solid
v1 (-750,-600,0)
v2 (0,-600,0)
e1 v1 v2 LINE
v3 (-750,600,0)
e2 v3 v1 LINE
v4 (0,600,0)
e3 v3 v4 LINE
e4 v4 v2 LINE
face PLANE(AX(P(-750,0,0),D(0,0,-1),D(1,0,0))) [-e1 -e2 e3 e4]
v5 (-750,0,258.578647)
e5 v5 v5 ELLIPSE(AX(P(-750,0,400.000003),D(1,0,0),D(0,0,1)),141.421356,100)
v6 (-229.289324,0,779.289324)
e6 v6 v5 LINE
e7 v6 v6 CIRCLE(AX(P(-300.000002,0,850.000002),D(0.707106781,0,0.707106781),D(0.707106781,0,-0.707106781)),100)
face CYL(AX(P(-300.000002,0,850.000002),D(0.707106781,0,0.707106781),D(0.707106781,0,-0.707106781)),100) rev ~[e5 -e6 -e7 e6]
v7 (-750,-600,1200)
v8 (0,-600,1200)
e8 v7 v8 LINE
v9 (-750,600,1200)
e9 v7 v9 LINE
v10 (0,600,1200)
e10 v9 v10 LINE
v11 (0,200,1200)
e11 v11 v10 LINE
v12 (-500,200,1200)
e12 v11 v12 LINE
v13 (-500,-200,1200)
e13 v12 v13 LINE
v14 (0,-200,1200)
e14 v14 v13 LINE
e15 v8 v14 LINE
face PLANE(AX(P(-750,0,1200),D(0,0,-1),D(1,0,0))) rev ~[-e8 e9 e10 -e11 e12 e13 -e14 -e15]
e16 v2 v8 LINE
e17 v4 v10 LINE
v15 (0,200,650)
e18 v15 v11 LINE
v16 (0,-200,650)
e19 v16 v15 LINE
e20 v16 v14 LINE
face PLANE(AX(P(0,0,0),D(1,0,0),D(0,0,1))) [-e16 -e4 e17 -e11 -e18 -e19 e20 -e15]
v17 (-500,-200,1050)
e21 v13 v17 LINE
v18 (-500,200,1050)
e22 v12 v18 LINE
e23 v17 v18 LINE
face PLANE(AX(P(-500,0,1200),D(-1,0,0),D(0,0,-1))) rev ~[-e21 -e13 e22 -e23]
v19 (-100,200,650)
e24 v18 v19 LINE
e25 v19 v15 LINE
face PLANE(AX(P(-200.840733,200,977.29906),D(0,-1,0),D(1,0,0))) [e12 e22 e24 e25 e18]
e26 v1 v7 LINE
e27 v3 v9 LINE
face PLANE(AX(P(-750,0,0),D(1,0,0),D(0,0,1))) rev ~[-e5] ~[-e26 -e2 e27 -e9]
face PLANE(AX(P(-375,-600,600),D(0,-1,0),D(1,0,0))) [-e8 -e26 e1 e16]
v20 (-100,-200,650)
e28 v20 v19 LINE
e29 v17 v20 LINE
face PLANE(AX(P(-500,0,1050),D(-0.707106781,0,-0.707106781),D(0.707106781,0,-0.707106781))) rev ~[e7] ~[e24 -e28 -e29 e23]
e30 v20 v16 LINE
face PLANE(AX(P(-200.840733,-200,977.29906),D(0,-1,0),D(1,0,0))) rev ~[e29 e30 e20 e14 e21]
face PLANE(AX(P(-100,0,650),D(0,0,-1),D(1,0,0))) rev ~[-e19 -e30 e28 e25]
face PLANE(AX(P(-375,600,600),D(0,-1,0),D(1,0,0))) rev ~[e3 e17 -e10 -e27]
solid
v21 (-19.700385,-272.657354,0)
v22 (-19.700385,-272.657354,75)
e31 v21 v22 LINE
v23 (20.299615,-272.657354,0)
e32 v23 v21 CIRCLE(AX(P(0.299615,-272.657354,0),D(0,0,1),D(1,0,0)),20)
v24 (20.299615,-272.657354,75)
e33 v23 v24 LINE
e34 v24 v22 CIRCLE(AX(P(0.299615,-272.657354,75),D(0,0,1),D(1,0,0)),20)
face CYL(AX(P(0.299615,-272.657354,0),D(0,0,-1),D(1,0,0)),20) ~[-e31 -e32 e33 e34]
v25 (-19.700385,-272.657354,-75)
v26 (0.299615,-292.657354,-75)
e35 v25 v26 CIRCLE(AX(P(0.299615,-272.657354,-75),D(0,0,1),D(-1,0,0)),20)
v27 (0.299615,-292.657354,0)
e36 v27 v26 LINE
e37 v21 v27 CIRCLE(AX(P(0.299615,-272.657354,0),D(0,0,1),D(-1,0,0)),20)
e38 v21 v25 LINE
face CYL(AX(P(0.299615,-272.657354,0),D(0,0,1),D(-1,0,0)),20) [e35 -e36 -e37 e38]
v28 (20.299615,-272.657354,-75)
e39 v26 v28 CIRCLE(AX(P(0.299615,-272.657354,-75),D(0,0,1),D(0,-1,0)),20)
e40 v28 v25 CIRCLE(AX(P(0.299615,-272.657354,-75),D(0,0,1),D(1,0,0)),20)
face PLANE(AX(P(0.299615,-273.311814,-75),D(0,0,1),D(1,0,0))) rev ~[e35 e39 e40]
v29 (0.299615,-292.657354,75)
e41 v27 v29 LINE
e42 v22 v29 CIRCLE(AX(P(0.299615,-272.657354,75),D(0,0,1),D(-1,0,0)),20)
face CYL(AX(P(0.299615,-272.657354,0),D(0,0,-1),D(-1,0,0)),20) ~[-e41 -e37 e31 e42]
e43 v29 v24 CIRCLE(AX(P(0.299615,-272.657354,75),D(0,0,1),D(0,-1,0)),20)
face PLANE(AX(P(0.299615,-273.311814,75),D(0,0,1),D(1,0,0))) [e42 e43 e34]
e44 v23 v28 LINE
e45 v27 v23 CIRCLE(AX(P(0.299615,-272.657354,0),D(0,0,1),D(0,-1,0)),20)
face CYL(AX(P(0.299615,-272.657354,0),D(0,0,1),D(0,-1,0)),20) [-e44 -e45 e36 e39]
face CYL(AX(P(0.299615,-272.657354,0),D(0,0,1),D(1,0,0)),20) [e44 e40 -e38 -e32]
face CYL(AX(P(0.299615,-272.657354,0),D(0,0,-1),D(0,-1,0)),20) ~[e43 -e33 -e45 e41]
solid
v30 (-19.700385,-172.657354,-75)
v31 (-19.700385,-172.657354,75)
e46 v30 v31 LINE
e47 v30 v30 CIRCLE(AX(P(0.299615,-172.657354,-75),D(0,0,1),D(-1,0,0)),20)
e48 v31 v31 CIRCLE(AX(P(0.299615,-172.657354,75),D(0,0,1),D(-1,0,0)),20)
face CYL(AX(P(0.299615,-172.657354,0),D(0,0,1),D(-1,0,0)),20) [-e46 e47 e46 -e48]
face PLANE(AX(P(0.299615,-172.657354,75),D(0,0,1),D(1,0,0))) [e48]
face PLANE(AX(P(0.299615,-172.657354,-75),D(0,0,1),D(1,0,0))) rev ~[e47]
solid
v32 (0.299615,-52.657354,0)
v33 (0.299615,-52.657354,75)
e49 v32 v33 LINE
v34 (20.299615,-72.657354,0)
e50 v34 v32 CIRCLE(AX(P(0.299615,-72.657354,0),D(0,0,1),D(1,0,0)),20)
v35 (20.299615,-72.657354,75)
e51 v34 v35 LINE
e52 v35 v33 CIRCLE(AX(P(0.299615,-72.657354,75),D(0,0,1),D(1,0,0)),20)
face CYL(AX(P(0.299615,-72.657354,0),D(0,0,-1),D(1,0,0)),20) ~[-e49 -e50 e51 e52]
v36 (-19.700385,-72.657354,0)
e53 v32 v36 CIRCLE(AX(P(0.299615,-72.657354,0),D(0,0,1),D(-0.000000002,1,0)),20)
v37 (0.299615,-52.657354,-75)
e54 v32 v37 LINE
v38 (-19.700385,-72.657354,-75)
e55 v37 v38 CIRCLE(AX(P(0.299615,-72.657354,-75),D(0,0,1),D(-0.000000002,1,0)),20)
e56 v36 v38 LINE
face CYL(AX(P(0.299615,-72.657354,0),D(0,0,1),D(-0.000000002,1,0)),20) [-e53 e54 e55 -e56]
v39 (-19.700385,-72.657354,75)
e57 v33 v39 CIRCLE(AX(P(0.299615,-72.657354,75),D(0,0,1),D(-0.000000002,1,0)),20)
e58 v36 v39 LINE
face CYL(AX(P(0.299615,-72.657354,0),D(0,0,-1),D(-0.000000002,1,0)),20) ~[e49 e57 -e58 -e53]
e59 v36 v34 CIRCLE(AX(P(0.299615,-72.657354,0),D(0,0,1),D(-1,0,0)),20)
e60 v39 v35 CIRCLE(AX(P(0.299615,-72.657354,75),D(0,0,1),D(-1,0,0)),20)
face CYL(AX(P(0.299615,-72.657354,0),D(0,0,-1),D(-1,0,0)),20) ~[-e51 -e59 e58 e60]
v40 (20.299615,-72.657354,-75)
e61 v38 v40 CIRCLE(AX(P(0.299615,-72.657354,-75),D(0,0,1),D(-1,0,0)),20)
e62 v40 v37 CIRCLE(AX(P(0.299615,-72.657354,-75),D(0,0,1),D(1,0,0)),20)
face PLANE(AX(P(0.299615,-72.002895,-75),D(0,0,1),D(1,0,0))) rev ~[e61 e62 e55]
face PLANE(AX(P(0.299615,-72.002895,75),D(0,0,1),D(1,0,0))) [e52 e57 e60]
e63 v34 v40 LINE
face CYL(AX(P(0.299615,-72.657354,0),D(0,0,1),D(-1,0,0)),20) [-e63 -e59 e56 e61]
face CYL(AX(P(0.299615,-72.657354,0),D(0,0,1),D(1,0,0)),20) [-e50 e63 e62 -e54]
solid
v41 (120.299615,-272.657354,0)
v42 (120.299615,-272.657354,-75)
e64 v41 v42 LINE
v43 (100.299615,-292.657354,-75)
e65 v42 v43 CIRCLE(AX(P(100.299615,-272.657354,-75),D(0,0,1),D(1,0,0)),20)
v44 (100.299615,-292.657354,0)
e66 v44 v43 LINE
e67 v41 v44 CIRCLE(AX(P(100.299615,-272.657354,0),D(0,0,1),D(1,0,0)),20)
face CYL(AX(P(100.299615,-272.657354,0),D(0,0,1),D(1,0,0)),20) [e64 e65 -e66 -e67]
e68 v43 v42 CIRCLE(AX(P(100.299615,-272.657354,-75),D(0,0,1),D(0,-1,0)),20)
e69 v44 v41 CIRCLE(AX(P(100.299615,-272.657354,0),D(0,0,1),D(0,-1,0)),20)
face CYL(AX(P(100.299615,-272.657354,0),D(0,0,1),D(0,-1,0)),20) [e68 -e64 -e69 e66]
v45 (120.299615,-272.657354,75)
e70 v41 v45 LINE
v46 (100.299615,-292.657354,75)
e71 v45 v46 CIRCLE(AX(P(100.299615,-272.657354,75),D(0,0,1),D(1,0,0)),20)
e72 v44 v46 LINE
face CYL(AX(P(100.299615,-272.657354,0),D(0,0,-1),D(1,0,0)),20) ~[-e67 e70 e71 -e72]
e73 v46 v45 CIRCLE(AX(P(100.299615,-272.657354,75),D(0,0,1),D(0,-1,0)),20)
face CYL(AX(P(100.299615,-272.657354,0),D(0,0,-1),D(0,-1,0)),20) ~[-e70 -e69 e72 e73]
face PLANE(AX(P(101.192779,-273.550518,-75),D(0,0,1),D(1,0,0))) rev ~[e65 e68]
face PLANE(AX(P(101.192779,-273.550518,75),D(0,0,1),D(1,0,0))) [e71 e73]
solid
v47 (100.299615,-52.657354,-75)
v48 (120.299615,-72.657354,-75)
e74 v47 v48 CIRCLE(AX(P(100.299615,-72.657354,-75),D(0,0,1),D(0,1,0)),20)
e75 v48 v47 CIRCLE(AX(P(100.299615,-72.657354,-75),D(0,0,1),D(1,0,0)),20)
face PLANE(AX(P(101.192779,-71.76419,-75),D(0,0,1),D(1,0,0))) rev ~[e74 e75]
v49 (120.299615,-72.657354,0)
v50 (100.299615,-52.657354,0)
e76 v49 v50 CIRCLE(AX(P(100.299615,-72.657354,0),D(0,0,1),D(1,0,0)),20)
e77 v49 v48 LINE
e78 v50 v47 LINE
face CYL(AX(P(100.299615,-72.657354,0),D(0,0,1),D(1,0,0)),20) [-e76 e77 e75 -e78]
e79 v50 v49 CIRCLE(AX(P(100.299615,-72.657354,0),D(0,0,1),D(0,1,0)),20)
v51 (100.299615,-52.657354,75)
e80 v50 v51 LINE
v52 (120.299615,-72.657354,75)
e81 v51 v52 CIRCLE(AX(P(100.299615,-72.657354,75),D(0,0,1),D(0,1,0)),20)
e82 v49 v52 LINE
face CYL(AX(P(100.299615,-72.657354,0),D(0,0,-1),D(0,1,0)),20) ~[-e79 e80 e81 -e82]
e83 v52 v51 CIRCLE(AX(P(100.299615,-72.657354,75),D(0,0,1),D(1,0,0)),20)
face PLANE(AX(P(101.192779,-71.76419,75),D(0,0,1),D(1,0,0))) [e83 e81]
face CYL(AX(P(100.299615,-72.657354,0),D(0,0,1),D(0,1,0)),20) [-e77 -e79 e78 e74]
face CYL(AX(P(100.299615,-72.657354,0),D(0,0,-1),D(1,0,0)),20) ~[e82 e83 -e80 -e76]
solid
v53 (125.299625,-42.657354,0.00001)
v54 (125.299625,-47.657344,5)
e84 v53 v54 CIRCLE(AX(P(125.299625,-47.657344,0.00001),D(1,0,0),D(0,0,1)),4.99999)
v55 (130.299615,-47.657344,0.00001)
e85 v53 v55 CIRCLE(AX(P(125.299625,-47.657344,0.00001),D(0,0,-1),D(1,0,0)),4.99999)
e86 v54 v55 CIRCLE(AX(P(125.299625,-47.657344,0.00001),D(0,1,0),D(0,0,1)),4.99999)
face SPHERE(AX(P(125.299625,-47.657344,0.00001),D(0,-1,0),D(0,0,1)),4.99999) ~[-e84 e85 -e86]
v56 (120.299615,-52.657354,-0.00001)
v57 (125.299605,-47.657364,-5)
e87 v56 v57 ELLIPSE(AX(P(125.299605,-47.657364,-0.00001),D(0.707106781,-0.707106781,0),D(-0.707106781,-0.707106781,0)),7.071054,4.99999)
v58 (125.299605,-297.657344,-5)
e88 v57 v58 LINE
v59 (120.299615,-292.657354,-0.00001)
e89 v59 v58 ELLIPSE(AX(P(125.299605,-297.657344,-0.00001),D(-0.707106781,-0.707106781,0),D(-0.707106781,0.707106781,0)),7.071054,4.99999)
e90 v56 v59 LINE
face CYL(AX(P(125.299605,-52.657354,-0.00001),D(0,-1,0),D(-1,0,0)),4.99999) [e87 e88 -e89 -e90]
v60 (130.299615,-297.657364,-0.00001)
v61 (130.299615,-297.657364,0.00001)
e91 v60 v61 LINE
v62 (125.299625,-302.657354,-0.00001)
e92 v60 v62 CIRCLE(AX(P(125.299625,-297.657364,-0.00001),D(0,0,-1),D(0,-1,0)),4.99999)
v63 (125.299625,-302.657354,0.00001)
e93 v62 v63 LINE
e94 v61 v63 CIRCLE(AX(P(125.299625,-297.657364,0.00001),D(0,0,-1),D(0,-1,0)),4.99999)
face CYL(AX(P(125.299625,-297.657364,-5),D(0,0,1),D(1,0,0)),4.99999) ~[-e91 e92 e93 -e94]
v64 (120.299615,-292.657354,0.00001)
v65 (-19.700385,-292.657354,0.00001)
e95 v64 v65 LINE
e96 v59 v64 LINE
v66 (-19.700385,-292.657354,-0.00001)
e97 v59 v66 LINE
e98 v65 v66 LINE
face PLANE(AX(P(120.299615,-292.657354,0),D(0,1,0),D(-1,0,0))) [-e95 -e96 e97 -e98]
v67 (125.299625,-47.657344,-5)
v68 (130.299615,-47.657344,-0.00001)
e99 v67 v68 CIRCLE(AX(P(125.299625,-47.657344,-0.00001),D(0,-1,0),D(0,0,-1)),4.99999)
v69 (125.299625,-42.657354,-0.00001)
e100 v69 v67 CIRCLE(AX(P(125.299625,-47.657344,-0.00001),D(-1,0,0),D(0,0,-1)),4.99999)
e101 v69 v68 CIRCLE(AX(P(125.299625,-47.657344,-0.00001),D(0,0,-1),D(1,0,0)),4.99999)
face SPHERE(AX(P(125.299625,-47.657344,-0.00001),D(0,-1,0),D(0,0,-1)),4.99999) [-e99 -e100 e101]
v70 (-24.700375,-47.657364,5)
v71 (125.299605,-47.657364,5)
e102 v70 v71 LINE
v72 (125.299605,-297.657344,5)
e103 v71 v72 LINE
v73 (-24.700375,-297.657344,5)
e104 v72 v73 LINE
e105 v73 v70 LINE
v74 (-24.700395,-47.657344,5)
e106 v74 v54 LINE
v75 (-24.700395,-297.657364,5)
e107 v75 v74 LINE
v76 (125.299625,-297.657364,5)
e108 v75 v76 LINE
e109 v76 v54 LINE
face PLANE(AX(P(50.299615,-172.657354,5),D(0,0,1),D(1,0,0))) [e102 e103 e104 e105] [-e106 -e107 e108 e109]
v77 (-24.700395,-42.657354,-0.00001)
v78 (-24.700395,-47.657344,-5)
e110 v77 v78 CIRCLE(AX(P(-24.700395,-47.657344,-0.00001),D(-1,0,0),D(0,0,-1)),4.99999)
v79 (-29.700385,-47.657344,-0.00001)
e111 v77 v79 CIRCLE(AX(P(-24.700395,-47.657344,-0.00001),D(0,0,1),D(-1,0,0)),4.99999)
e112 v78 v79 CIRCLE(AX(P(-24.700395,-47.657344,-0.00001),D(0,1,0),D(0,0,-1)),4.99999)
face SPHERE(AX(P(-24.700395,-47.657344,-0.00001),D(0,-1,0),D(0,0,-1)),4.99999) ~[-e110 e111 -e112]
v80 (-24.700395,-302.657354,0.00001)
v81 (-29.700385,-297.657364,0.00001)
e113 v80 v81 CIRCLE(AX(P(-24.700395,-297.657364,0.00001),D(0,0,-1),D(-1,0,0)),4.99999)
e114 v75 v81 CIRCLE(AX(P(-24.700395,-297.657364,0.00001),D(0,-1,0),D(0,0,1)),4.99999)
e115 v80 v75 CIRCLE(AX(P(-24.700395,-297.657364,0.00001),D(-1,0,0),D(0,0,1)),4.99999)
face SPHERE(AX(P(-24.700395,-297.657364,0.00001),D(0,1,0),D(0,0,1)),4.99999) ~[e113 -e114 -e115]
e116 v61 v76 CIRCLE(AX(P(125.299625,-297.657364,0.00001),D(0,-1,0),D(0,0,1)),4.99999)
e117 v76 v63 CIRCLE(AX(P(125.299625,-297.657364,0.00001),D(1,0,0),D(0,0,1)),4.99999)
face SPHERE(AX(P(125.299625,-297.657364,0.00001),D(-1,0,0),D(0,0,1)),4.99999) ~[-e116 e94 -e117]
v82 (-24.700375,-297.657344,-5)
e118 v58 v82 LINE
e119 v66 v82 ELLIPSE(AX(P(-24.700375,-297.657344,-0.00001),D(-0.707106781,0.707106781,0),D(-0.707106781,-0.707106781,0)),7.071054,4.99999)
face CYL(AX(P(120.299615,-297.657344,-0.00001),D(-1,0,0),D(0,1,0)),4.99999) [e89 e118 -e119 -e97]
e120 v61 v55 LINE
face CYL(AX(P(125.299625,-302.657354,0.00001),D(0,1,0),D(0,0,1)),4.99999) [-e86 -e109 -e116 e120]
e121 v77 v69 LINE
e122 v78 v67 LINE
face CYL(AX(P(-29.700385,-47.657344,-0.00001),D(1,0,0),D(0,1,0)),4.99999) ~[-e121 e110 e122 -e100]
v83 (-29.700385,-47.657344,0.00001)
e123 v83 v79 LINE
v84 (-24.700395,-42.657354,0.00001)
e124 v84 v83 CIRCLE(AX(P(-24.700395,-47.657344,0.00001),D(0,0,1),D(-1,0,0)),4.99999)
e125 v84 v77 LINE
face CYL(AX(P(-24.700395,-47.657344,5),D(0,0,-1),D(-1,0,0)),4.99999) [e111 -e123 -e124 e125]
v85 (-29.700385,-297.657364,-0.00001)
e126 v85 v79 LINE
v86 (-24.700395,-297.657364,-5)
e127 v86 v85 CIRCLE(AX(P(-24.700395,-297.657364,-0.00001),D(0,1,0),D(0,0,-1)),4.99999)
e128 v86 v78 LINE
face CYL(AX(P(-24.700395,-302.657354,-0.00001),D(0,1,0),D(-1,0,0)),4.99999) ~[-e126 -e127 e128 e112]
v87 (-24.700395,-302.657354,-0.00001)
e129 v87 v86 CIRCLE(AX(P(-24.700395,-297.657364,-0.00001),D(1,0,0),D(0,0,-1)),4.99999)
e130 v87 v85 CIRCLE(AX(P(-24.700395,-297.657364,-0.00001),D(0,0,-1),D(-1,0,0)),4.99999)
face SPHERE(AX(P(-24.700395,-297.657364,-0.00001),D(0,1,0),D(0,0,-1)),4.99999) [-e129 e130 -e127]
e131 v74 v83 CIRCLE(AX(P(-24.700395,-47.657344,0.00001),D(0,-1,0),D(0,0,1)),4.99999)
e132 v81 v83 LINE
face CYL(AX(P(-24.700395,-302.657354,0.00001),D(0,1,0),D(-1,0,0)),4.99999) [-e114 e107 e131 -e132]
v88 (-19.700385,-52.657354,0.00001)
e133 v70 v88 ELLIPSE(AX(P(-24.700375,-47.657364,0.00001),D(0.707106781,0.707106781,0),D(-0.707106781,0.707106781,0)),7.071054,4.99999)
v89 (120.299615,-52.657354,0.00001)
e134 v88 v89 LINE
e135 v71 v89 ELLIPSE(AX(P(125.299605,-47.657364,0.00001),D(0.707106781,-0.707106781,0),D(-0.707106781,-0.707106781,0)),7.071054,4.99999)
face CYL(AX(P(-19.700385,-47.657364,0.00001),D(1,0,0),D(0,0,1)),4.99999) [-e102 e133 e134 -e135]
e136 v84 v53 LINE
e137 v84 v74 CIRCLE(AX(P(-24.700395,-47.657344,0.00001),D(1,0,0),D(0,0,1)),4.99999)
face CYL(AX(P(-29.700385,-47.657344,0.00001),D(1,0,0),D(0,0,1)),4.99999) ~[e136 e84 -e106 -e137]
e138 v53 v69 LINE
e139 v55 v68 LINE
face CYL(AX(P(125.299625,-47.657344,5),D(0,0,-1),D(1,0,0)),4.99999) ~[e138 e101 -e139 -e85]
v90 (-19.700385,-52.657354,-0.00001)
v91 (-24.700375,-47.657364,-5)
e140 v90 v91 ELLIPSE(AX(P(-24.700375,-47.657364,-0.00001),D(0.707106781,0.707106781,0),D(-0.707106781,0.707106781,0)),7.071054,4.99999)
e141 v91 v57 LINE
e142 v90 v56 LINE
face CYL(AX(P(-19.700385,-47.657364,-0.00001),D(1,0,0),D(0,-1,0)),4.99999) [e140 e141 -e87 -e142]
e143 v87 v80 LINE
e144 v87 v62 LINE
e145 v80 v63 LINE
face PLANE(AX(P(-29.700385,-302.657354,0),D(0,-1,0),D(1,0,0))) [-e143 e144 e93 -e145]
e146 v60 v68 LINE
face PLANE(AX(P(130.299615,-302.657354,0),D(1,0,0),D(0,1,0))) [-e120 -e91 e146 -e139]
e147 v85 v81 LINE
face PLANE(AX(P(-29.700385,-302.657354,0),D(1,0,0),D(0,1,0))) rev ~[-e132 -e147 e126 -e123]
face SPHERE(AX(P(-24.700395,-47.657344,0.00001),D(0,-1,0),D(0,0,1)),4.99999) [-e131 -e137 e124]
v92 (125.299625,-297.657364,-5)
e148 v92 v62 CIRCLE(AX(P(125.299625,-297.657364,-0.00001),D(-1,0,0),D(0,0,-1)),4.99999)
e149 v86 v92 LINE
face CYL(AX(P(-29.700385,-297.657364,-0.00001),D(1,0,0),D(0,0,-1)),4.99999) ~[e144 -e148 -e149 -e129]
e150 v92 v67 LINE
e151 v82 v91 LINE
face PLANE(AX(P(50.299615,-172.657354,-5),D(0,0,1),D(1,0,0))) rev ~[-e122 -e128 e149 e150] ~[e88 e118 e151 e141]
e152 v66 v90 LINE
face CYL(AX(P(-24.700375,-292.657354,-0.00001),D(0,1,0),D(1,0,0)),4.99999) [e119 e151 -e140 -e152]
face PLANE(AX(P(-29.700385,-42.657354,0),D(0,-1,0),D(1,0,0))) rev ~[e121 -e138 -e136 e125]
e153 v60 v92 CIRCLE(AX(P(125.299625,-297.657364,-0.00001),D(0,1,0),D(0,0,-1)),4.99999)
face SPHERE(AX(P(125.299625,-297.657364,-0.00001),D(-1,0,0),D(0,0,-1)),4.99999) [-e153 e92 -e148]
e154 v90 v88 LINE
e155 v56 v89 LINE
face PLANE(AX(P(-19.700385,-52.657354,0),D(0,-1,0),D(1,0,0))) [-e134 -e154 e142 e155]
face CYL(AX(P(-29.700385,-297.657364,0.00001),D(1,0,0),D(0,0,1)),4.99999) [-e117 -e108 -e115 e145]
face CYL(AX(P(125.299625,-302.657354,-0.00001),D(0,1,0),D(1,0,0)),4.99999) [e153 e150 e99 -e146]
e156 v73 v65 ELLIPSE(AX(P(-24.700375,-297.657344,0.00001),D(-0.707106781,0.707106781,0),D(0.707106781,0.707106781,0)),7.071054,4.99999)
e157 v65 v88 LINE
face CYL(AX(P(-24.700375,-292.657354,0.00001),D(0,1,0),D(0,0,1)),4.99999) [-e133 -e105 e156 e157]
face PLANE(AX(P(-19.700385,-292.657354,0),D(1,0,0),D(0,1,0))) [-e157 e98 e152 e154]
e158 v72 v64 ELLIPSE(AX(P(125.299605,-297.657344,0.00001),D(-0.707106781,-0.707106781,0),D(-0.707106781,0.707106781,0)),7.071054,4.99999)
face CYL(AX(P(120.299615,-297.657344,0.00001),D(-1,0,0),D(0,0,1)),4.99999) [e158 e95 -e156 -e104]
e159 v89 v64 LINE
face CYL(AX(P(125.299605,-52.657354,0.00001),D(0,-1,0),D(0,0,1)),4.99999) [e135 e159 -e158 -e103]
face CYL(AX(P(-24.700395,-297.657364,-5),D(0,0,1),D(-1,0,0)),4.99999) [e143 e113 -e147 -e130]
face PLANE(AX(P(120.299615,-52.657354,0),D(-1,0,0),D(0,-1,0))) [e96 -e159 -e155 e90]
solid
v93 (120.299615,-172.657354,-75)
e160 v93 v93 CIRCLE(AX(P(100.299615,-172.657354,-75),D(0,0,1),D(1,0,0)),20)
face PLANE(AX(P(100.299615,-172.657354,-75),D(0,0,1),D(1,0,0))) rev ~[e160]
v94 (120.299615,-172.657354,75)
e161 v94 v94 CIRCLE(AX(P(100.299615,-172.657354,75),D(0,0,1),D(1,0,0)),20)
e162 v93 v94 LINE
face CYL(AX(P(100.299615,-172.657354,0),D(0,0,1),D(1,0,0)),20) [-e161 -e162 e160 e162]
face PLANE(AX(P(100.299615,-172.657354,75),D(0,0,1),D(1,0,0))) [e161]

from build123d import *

# Parameters (mm, degrees)
F0_W     = 750
F0_H     = 1200
F1_DEPTH = 600
F3_DEPTH = 200
F4_R     = 100
F5_DEPTH = 919.2398155425
F7_DEPTH = 75
F6_R     = 20
F6_W     = 160
F6_H     = 260
F8_DEPTH = 5
F9_R     = 4.99999


# Not quite as in the source:
# - a fillet or chamfer is up to 0.001 mm smaller than in the source, because OpenCascade refuses the exact size


with BuildPart() as f1:
    # F0 (on Front) → F1 (new body, symmetric)
    with BuildSketch(Plane.XZ):
        with Locations((-375, 600)):
            Rectangle(F0_W, F0_H)
    extrude(amount=F1_DEPTH, both=True)

    # F2 (on Front) → F3 (cut, symmetric)
    with BuildSketch(Plane.XZ):
        Polygon((0, 650), (0, 1200), (-500, 1200), (-500, 1050), (-100, 650), align=None)
    extrude(amount=F3_DEPTH, both=True, mode=Mode.SUBTRACT)

    # F4 (on face) → F5 (cut, through all)
    with BuildSketch(Plane(origin=(275, 0, 275), x_dir=(0.7071067812, 0, -0.7071067812), z_dir=(0.7071067812, 0, 0.7071067812))):
        with Locations((-813.1728008391, 0)):
            Circle(F4_R)
    extrude(amount=-F5_DEPTH, mode=Mode.SUBTRACT)


with BuildPart() as f7:
    # F6 (on Top) → F7 (new body, symmetric)
    with BuildSketch(Plane.XY):
        with BuildLine():
            ThreePointArc((20.2996149659, -172.657354176), (0.2996149659, -152.657354176), (-19.7003850341, -172.657354176))
            ThreePointArc((-19.7003850341, -172.657354176), (0.2996149659, -192.657354176), (20.2996149659, -172.657354176))
        make_face()
    extrude(amount=F7_DEPTH, both=True)


with BuildPart() as f7b:
    # F6 (on Top) → F7, piece 2 (new body, symmetric)
    with BuildSketch(Plane.XY):
        with Locations((100.2996149659, -172.657354176)):
            Circle(F6_R)
    extrude(amount=F7_DEPTH, both=True)


with BuildPart() as f7c:
    # F6 (on Top) → F7, piece 3 (new body, symmetric)
    with BuildSketch(Plane.XY):
        with BuildLine():
            ThreePointArc((120.2996149659, -72.657354176), (114.4417505896, -58.5152185523), (100.2996149659, -52.657354176))
            ThreePointArc((100.2996149659, -52.657354176), (86.1574793422, -86.7994897998), (120.2996149659, -72.657354176))
        make_face()
    extrude(amount=F7_DEPTH, both=True)


with BuildPart() as f7d:
    # F6 (on Top) → F7, piece 4 (new body, symmetric)
    with BuildSketch(Plane.XY):
        with BuildLine():
            ThreePointArc((20.2996149659, -72.657354176), (14.4417505732, -58.5152185358), (0.2996149193, -52.657354176))
            ThreePointArc((0.2996149193, -52.657354176), (-13.8425206743, -58.5152185688), (-19.7003850341, -72.657354176))
            ThreePointArc((-19.7003850341, -72.657354176), (0.2996149659, -92.657354176), (20.2996149659, -72.657354176))
        make_face()
    extrude(amount=F7_DEPTH, both=True)


with BuildPart() as f7e:
    # F6 (on Top) → F7, piece 5 (new body, symmetric)
    with BuildSketch(Plane.XY):
        with BuildLine():
            ThreePointArc((20.2996149659, -272.657354176), (0.2996149659, -252.657354176), (-19.7003850341, -272.657354176))
            ThreePointArc((-19.7003850341, -272.657354176), (-13.8425206578, -286.7994897998), (0.2996149659, -292.657354176))
            ThreePointArc((0.2996149659, -292.657354176), (14.4417505896, -286.7994897998), (20.2996149659, -272.657354176))
        make_face()
    extrude(amount=F7_DEPTH, both=True)


with BuildPart() as f7f:
    # F6 (on Top) → F7, piece 6 (new body, symmetric)
    with BuildSketch(Plane.XY):
        with BuildLine():
            ThreePointArc((100.2996149659, -292.657354176), (114.4417505896, -286.7994897998), (120.2996149659, -272.657354176))
            ThreePointArc((120.2996149659, -272.657354176), (86.1574793422, -258.5152185523), (100.2996149659, -292.657354176))
        make_face()
    extrude(amount=F7_DEPTH, both=True)


with BuildPart() as f8:
    # F6 (on Top) → F8 (new body, symmetric)
    with BuildSketch(Plane.XY):
        with Locations((50.2996149659, -172.657354176)):
            Rectangle(F6_W, F6_H)
        Polygon((-19.7003850341, -72.657354176), (-19.7003850341, -52.657354176), (0.2996149193, -52.657354176), (100.2996149659, -52.657354176), (120.2996149659, -52.657354176), (120.2996149659, -72.657354176), (120.2996149659, -172.657354176), (120.2996149659, -272.657354176), (120.2996149659, -292.657354176), (100.2996149659, -292.657354176), (0.2996149659, -292.657354176), (-19.7003850341, -292.657354176), (-19.7003850341, -272.657354176), (-19.7003850341, -172.657354176), align=None, mode=Mode.SUBTRACT)
    extrude(amount=F8_DEPTH, both=True)

    # F9 (radius 5 in the source; OpenCascade refuses exactly that, so slightly less here)
    f9_edges = [f8.edges().sort_by_distance(p)[0] for p in [
        (-29.700385, -172.657354, 5),
        (-19.700385, -172.657354, 5),
        (-29.700385, -172.657354, -5),
        (50.299615, -302.657354, -5),
        (50.299615, -302.657354, 5),
        (50.299615, -292.657354, 5),
        (50.299615, -292.657354, -5),
        (-19.700385, -172.657354, -5),
        (120.299615, -172.657354, -5),
        (130.299615, -172.657354, -5),
        (130.299615, -172.657354, 5),
        (120.299615, -172.657354, 5),
        (130.299615, -302.657354, 0),
        (-29.700385, -302.657354, 0),
        (50.299615, -42.657354, 5),
        (50.299615, -42.657354, -5),
        (130.299615, -42.657354, 0),
        (50.299615, -52.657354, 5),
        (-29.700385, -42.657354, 0),
        (50.299615, -52.657354, -5),
    ]]
    fillet(f9_edges, radius=F9_R)


solid = Compound([f1.part, f7.part, f7b.part, f7c.part, f7d.part, f7e.part, f7f.part, f8.part])
